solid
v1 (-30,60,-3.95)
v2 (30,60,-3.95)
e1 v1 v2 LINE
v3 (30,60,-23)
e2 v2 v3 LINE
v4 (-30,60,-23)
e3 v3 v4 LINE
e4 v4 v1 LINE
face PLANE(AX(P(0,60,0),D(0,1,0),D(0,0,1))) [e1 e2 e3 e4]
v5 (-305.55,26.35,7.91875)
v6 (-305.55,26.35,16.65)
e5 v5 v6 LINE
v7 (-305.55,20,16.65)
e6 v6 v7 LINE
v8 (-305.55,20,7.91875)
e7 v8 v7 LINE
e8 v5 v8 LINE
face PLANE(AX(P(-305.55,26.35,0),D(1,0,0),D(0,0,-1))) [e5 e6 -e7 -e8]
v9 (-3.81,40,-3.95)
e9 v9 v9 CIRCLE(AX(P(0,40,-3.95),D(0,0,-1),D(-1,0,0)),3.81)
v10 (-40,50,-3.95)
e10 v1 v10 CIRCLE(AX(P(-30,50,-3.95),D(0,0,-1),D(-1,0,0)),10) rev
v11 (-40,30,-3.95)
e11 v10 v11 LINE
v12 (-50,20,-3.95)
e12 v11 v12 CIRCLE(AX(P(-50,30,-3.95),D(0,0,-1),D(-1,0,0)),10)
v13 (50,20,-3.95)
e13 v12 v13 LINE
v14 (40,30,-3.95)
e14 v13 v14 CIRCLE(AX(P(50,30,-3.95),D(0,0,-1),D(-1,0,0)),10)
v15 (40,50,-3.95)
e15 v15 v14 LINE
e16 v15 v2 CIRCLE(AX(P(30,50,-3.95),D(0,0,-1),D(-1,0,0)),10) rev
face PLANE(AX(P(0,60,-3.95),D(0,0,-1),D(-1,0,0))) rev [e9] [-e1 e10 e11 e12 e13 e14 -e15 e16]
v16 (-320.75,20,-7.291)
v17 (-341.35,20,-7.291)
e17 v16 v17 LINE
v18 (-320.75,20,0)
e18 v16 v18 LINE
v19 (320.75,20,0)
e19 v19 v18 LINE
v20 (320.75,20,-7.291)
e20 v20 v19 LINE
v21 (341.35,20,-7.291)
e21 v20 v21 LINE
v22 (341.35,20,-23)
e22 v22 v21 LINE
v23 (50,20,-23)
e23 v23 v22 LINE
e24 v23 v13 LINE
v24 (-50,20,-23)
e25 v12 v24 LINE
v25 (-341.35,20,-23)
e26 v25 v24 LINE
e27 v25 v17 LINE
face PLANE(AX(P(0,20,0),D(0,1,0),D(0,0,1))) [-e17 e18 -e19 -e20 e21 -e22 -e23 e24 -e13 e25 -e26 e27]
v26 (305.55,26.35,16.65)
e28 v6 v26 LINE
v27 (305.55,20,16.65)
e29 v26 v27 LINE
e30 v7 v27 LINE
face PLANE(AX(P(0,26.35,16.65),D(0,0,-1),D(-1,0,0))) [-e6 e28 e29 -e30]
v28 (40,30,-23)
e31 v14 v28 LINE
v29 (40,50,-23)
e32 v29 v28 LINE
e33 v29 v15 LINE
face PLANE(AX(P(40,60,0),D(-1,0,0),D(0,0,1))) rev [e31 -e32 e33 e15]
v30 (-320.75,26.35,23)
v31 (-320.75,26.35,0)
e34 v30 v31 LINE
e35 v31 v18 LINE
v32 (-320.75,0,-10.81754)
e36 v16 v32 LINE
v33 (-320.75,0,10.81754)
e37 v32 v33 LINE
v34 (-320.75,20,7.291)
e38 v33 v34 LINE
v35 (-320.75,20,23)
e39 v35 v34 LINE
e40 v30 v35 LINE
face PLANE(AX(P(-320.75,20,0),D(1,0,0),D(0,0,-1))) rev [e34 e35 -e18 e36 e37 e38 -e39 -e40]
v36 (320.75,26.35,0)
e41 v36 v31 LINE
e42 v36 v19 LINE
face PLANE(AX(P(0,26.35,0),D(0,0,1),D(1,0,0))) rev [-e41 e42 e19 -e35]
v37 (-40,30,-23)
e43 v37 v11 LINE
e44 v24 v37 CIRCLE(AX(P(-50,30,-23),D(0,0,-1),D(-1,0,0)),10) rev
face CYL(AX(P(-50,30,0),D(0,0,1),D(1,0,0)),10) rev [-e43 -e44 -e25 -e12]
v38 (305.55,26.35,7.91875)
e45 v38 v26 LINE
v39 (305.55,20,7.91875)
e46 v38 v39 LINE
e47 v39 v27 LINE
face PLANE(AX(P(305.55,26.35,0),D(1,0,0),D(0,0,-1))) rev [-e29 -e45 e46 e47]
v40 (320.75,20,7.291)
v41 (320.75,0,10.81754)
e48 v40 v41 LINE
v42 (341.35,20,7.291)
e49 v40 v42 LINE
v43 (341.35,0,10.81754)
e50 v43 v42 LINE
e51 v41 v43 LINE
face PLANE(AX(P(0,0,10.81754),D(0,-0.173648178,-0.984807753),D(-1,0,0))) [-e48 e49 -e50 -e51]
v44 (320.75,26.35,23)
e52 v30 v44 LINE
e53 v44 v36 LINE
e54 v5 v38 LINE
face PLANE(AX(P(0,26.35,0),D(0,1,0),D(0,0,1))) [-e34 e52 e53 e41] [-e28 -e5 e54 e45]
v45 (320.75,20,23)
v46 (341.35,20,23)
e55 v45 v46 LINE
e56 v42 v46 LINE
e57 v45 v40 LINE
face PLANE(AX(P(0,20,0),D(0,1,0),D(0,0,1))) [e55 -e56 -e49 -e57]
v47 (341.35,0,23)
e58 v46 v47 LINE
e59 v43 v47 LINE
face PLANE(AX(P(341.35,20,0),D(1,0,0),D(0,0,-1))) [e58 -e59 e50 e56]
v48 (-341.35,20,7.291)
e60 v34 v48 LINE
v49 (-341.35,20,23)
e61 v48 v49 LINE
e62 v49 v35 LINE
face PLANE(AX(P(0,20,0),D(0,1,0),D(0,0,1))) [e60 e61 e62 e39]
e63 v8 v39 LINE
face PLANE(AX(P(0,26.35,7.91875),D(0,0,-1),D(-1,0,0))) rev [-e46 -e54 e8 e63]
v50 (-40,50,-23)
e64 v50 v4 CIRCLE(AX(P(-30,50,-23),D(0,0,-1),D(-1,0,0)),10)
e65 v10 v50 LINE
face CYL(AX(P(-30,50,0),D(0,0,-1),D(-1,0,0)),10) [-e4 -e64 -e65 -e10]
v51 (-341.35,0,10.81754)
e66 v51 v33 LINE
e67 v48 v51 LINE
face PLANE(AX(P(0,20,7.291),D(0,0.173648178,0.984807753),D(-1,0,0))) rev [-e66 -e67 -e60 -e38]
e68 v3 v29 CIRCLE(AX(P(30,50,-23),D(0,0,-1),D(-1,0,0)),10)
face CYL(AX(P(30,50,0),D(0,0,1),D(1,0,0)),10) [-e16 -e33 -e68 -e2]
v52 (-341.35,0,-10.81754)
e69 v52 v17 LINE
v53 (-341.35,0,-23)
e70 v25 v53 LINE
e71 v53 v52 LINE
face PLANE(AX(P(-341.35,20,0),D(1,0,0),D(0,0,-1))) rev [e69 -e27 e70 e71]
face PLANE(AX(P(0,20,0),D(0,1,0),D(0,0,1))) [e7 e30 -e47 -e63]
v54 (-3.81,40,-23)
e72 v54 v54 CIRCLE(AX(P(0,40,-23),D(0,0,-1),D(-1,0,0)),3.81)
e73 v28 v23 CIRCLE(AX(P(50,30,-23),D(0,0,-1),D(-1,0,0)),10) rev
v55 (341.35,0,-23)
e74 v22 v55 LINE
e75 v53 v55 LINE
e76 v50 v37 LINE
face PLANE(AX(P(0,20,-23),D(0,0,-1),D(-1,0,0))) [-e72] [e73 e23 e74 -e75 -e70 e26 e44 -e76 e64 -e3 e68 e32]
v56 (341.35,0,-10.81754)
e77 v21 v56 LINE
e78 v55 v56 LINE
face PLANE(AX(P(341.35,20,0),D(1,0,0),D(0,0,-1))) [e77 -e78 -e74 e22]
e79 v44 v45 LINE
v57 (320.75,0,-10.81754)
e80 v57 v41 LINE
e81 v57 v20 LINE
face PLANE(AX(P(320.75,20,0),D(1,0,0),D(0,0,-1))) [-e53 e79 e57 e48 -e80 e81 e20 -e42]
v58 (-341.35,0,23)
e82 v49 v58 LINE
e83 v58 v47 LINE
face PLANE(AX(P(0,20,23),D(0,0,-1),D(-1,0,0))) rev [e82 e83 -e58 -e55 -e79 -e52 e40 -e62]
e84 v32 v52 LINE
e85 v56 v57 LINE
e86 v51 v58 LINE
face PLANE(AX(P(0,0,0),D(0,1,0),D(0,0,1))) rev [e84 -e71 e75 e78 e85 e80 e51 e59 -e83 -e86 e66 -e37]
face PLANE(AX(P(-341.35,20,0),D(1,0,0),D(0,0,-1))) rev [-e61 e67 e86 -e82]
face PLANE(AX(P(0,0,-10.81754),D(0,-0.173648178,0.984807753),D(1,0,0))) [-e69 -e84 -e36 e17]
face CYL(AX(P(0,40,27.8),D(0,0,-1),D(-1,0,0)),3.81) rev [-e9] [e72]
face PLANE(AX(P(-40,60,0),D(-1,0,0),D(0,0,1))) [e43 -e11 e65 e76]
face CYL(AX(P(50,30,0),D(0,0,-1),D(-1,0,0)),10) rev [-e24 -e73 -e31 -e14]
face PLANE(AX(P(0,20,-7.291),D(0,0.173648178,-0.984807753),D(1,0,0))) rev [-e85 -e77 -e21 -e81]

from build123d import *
from OCP.BRepFilletAPI import BRepFilletAPI_MakeChamfer

# Parameters (mm, degrees)
BOSS_EXTRUDE1_DEPTH = 20
SKETCH2_W           = 641.5
SKETCH2_H           = 23
SKETCH2_W_2         = 611.1
SKETCH2_H_2         = 8.73125
BOSS_EXTRUDE2_DEPTH = 6.35
SKETCH4_W           = 80
SKETCH4_H           = 19.05
BOSS_EXTRUDE3_DEPTH = 40
CUT_EXTRUDE2_DEPTH  = 50.8
CHAMFER1_SIZE       = 20
CHAMFER1_SIZE_2     = 3.526539614
FILLET1_R           = 10


with BuildPart() as part:
    # Sketch1 → Boss-Extrude1 (new body)
    with BuildSketch(Plane(origin=(0, 0, 0), x_dir=(1, 0, 0), z_dir=(0, 1, 0))):
        Polygon((-341.35, 23), (-341.35, 7.291), (-320.75, 7.291), (-320.75, -7.291), (-341.35, -7.291), (-341.35, -23), (341.35, -23), (341.35, -7.291), (320.75, -7.291), (320.75, 7.291), (341.35, 7.291), (341.35, 23), align=None)
    extrude(amount=BOSS_EXTRUDE1_DEPTH)

    # Sketch2 → Boss-Extrude2 (add)
    with BuildSketch(Plane(origin=(0, 20, 0), x_dir=(1, 0, 0), z_dir=(0, 1, 0))):
        with Locations((0, -11.5)):
            Rectangle(SKETCH2_W, SKETCH2_H)
        with Locations((0, -12.284375)):
            Rectangle(SKETCH2_W_2, SKETCH2_H_2, mode=Mode.SUBTRACT)
    extrude(amount=BOSS_EXTRUDE2_DEPTH)

    # Sketch4 → Boss-Extrude3 (add)
    with BuildSketch(Plane(origin=(0, 20, 0), x_dir=(1, 0, 0), z_dir=(0, 1, 0))):
        with Locations((0, 13.475)):
            Rectangle(SKETCH4_W, SKETCH4_H)
    extrude(amount=BOSS_EXTRUDE3_DEPTH)

    # Sketch5 → Cut-Extrude2 (cut)
    with BuildSketch(Plane(origin=(0, 0, -23), x_dir=(-1, 0, 0), z_dir=(0, 0, -1))):
        with BuildLine():
            ThreePointArc((3.407767598, 41.703883799), (0, 43.81), (-3.407767598, 41.703883799))
            Line((-3.407767598, 41.703883799), (0, 40))
            Line((0, 40), (3.407767598, 41.703883799))
        make_face()
        with BuildLine():
            Line((0, 40), (-3.407767598, 41.703883799))
            ThreePointArc((-3.407767598, 41.703883799), (-3.81, 40), (-3.407767598, 38.296116201))
            Line((-3.407767598, 38.296116201), (0, 40))
        make_face()
        with BuildLine():
            Line((3.407767598, 41.703883799), (0, 40))
            Line((0, 40), (3.407767598, 38.296116201))
            ThreePointArc((3.407767598, 38.296116201), (3.70807865, 39.124641373), (3.81, 40))
            ThreePointArc((3.81, 40), (3.70807865, 40.875358627), (3.407767598, 41.703883799))
        make_face()
        with BuildLine():
            Line((3.407767598, 38.296116201), (0, 40))
            Line((0, 40), (-3.407767598, 38.296116201))
            ThreePointArc((-3.407767598, 38.296116201), (0, 36.19), (3.407767598, 38.296116201))
        make_face()
    extrude(amount=-CUT_EXTRUDE2_DEPTH, mode=Mode.SUBTRACT)

    # Chamfer1
    chamfer1_edges_1 = [part.edges().sort_by_distance(p)[0] for p in [
        (331.05, 0, -7.291),
    ]]
    chamfer1_side_1 = [part.faces().sort_by_distance(p)[0] for p in [
        (331.05, 0.070530792, -7.291),
    ]]
    chamfer1_edges_2 = [part.edges().sort_by_distance(p)[0] for p in [
        (331.05, 0, 7.291),
    ]]
    chamfer1_side_2 = [part.faces().sort_by_distance(p)[0] for p in [
        (331.05, 0, 7.361530792),
    ]]
    chamfer1_edges_3 = [part.edges().sort_by_distance(p)[0] for p in [
        (-331.05, 0, 7.291),
    ]]
    chamfer1_side_3 = [part.faces().sort_by_distance(p)[0] for p in [
        (-331.05, 0, 7.361530792),
    ]]
    chamfer1_edges_4 = [part.edges().sort_by_distance(p)[0] for p in [
        (-331.05, 0, -7.291),
    ]]
    chamfer1_side_4 = [part.faces().sort_by_distance(p)[0] for p in [
        (-331.05, 0, -7.361530792),
    ]]
    chamfer1 = BRepFilletAPI_MakeChamfer(part.part.solid().wrapped)
    for e in chamfer1_edges_1:
        chamfer1.Add(CHAMFER1_SIZE - 0.0001, CHAMFER1_SIZE_2 - 0.0001, e.wrapped, chamfer1_side_1[0].wrapped)
    for e in chamfer1_edges_2:
        chamfer1.Add(CHAMFER1_SIZE_2 - 0.0001, CHAMFER1_SIZE - 0.0001, e.wrapped, chamfer1_side_2[0].wrapped)
    for e in chamfer1_edges_3:
        chamfer1.Add(CHAMFER1_SIZE_2 - 0.0001, CHAMFER1_SIZE - 0.0001, e.wrapped, chamfer1_side_3[0].wrapped)
    for e in chamfer1_edges_4:
        chamfer1.Add(CHAMFER1_SIZE_2 - 0.0001, CHAMFER1_SIZE - 0.0001, e.wrapped, chamfer1_side_4[0].wrapped)
    add(Compound.cast(chamfer1.Shape()), mode=Mode.REPLACE)  # a hair under: the kernel refuses the full size

    # Fillet1
    fillet1_edges = [part.edges().sort_by_distance(p)[0] for p in [
        (40, 20, -13.475),
        (-40, 60, -13.475),
        (40, 60, -13.475),
        (-40, 20, -13.475),
    ]]
    fillet(fillet1_edges, radius=FILLET1_R)


solid = part.part
